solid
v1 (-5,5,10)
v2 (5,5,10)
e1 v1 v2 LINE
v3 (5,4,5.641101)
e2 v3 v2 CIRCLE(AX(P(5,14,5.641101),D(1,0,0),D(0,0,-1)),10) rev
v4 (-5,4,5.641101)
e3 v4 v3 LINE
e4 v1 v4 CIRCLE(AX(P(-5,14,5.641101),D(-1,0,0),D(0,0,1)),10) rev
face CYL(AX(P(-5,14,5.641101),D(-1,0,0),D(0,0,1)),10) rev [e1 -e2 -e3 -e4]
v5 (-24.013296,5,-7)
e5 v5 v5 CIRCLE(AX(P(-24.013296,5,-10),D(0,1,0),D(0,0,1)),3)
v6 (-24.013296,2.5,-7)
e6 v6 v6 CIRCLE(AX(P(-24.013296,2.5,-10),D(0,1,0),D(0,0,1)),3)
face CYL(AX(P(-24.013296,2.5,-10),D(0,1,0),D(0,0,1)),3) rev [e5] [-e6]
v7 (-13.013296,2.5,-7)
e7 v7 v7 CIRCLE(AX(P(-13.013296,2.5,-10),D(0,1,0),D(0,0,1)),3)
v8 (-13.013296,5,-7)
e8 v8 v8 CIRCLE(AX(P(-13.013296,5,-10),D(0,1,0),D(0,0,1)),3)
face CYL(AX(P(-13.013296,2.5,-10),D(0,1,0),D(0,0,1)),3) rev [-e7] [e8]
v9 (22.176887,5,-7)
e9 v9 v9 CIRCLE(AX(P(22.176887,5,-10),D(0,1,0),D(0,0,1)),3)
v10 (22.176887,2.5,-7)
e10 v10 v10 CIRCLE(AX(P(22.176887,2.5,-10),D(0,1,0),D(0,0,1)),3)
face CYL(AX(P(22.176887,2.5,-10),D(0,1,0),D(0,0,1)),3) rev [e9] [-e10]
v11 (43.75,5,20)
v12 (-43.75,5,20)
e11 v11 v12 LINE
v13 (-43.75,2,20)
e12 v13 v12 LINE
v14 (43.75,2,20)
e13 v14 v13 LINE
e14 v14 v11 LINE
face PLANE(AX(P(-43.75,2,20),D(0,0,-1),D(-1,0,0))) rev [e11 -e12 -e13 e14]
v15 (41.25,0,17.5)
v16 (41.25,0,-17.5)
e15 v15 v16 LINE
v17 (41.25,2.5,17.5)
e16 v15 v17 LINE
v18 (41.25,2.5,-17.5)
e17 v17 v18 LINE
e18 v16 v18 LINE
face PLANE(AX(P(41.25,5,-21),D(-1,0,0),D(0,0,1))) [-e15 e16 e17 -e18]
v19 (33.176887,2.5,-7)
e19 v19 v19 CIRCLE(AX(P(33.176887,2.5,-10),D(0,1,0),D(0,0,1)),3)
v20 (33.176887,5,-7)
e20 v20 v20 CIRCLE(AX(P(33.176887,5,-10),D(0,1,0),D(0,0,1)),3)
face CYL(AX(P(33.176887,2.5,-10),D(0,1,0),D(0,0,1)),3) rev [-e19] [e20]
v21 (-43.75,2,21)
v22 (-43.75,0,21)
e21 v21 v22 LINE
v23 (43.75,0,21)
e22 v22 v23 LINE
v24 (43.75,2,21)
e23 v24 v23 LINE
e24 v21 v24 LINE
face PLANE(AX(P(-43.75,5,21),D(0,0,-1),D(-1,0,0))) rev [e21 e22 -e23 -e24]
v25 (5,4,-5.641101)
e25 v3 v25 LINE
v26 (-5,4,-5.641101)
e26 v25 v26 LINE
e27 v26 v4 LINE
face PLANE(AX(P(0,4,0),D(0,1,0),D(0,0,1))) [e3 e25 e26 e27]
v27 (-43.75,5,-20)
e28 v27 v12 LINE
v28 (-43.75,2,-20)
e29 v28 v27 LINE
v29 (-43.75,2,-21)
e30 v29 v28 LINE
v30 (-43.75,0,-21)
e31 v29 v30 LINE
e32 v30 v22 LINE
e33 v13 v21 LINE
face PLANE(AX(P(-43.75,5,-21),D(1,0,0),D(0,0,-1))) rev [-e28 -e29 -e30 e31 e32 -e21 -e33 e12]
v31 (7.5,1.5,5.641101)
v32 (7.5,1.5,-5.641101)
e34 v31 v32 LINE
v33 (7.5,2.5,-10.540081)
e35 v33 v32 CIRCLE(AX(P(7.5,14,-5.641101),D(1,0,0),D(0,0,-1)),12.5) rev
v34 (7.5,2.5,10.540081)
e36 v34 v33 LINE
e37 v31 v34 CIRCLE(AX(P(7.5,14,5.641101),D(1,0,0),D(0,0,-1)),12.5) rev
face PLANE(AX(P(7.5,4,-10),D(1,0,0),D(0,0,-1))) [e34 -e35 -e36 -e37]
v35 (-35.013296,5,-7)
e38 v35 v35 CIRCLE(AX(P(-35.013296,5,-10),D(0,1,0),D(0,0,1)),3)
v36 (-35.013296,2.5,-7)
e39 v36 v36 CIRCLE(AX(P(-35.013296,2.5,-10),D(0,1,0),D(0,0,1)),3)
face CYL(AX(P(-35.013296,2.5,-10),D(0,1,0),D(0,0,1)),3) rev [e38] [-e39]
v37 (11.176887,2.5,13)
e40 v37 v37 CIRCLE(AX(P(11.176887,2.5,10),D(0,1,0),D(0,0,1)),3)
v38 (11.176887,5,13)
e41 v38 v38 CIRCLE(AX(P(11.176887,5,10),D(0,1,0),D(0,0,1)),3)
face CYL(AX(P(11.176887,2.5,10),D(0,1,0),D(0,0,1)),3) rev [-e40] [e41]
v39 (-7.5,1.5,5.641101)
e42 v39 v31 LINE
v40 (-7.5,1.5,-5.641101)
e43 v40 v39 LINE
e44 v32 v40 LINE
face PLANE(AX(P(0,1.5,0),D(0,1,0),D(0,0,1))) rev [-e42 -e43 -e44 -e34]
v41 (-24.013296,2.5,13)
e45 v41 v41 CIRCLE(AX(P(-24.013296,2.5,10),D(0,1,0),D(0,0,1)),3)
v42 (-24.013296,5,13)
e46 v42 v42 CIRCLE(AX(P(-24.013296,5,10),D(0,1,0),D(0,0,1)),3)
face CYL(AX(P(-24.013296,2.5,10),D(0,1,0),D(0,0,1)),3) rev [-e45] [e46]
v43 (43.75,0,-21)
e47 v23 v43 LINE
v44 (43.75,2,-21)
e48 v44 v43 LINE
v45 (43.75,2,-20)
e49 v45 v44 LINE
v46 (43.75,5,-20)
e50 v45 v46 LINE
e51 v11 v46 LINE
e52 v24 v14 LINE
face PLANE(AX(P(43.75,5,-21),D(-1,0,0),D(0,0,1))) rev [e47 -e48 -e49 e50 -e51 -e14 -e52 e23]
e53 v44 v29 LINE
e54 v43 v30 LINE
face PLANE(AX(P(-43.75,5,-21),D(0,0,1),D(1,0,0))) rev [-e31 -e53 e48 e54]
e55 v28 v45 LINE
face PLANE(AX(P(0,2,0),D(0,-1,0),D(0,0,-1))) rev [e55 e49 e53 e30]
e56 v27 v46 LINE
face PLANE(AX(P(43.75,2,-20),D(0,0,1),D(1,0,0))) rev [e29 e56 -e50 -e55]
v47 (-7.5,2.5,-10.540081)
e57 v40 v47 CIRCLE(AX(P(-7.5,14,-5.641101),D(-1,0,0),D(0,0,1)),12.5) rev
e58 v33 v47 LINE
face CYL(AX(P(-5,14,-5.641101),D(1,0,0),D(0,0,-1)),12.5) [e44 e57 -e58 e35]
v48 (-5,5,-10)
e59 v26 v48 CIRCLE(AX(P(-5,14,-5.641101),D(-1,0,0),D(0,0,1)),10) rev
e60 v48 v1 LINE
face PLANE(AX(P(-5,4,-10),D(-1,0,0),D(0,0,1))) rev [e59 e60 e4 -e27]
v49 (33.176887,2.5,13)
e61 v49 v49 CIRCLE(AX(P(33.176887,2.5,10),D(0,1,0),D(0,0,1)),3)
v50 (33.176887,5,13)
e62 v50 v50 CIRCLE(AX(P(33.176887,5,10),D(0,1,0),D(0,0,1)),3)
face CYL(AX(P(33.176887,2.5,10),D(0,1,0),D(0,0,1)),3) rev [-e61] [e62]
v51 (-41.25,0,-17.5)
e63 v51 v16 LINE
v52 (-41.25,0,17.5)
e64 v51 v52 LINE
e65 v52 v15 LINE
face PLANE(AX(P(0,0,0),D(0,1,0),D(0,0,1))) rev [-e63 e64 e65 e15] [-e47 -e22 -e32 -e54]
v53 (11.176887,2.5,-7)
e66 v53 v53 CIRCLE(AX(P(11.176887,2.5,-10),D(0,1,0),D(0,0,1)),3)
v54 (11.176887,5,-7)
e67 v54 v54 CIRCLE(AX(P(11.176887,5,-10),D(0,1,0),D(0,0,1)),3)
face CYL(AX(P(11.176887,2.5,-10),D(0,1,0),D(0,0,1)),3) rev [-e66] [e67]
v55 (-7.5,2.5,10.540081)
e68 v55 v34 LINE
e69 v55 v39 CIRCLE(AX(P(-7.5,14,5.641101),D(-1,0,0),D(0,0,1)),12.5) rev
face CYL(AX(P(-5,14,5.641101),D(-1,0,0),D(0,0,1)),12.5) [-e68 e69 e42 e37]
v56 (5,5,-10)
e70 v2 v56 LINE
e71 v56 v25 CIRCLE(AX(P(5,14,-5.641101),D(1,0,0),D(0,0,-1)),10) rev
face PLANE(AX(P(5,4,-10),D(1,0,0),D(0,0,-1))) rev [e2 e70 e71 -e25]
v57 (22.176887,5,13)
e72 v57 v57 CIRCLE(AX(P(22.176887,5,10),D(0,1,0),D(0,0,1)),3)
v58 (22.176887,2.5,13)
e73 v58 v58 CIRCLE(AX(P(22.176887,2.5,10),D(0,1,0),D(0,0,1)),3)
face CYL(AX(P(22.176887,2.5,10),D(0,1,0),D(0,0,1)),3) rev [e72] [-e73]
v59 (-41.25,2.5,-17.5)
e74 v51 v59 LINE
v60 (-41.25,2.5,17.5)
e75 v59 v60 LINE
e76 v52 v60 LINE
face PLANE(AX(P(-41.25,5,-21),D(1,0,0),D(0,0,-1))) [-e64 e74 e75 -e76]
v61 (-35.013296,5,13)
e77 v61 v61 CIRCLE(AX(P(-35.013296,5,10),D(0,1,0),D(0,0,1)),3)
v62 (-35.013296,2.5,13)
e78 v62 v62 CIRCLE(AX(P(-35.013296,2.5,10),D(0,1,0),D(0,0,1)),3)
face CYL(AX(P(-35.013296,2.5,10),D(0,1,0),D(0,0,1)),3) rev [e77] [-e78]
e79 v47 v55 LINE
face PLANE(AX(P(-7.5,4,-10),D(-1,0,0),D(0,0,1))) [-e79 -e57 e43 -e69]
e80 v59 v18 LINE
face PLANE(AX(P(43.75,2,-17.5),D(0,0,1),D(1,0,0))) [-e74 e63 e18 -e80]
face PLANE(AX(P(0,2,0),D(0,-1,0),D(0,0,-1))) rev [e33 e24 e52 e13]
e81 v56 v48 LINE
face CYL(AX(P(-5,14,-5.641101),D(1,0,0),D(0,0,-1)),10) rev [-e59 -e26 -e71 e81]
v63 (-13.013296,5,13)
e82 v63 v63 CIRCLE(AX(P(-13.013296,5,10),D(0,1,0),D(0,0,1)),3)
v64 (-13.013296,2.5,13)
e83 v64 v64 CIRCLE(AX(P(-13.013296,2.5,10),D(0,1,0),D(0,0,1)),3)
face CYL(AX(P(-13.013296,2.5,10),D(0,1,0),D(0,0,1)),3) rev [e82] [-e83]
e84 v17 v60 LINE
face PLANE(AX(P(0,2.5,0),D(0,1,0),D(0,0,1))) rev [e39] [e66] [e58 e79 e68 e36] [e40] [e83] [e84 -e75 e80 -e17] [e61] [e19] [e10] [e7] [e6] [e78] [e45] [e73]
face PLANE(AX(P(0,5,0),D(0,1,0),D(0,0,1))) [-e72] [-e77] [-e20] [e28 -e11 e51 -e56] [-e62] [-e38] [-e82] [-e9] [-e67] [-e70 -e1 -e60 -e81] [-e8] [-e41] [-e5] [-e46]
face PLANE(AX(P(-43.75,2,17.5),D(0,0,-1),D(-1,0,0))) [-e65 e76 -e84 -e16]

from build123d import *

# Parameters (mm, degrees)
SKETCH1_W           = 87.5
SKETCH1_H           = 42
BOSS_EXTRUDE1_DEPTH = 5
SKETCH2_W           = 87.5
SKETCH2_H           = 1
CUT_EXTRUDE1_DEPTH  = 3
SKETCH3_W           = 87.5
SKETCH3_H           = 1
CUT_EXTRUDE2_DEPTH  = 3
SKETCH4_W           = 10
SKETCH4_H           = 20
CUT_EXTRUDE3_DEPTH  = 1
FILLET1_R           = 10
FILLET2_R           = 10
SHELL6_START        = -41.25
SHELL6_DEPTH        = 82.5
SHELL6_2_DEPTH      = 33.75
SHELL6_START_2      = 7.5
SHELL6_3_DEPTH      = 33.75
SKETCH5_R           = 3
CUT_EXTRUDE4_DEPTH  = 2.5
LPATTERN1_COUNT     = 3
LPATTERN1_PITCH     = 11


# Read off the part's stored shape, not the designer's step: Shell6
with BuildPart() as part:
    # Sketch1 → Boss-Extrude1 (new body)
    with BuildSketch(Plane(origin=(0, 0, 0), x_dir=(1, 0, 0), z_dir=(0, 1, 0))):
        Rectangle(SKETCH1_W, SKETCH1_H)
    extrude(amount=BOSS_EXTRUDE1_DEPTH)

    # Sketch2 → Cut-Extrude1 (cut)
    with BuildSketch(Plane(origin=(0, 5, 0), x_dir=(1, 0, 0), z_dir=(0, 1, 0))):
        with Locations((0, 20.5)):
            Rectangle(SKETCH2_W, SKETCH2_H)
    extrude(amount=-CUT_EXTRUDE1_DEPTH, mode=Mode.SUBTRACT)

    # Sketch3 → Cut-Extrude2 (cut)
    with BuildSketch(Plane(origin=(0, 5, 0), x_dir=(1, 0, 0), z_dir=(0, 1, 0))):
        with Locations((0, -20.5)):
            Rectangle(SKETCH3_W, SKETCH3_H)
    extrude(amount=-CUT_EXTRUDE2_DEPTH, mode=Mode.SUBTRACT)

    # Sketch4 → Cut-Extrude3 (cut)
    with BuildSketch(Plane(origin=(0, 5, 0), x_dir=(1, 0, 0), z_dir=(0, 1, 0))):
        Rectangle(SKETCH4_W, SKETCH4_H)
    extrude(amount=-CUT_EXTRUDE3_DEPTH, mode=Mode.SUBTRACT)

    # Fillet1
    # the kernel refuses this fillet: 10 mm, written as the material it adds along each edge
    with BuildSketch(Plane(origin=(15.897247359, 4, 10), x_dir=(0, 1, 0), z_dir=(-1, 0, 0))) as fillet1_piece_1:
        with BuildLine():
            CenterArc((10, 4.358898944), FILLET1_R, 180, 25.841932763)
            Line((0, 4.358898944), (-0.2, 4.358898944))
            Line((-0.2, 4.358898944), (-0.2, 0))
            Line((-0.2, 0), (0, -0.2))
            ThreePointArc((0, -0.2), (0.5, -0.2), (0.82, -0.087177979))
            Line((0.82, -0.087177979), (1, 0))
        make_face()
    extrude(amount=31.794494718)

    # Fillet2
    # the kernel refuses this fillet: 10 mm, written as the material it adds along each edge
    with BuildSketch(Plane(origin=(-15.897247359, 4, -10), x_dir=(0, 0, 1), z_dir=(1, 0, 0))) as fillet2_piece_1:
        with BuildLine():
            CenterArc((4.358898944, -10), FILLET2_R, 90, 25.841932763)
            Line((0, -1), (-0.087177979, -0.82))
            ThreePointArc((-0.087177979, -0.82), (-0.2, -0.5), (-0.2, 0))
            Line((-0.2, 0), (0, 0.2))
            Line((0, 0.2), (4.358898944, 0.2))
            Line((4.358898944, 0.2), (4.358898944, 0))
        make_face()
    extrude(amount=31.794494718)

    # Shell6 outline → Shell6 (cut)
    with BuildSketch(Plane.YZ.offset(SHELL6_START)):
        with BuildLine():
            Line((0, -17.5), (2.5, -17.5))
            Line((2.5, -17.5), (2.5, -10.540080542))
            ThreePointArc((2.5, -10.540080542), (1.752551286, -8.141101056), (1.5, -5.641101056))
            Line((1.5, -5.641101056), (1.5, 5.641101056))
            ThreePointArc((1.5, 5.641101056), (1.752551286, 8.141101056), (2.5, 10.540080542))
            Line((2.5, 10.540080542), (2.5, 17.5))
            Line((2.5, 17.5), (0, 17.5))
            Line((0, 17.5), (0, -17.5))
        make_face()
    extrude(amount=SHELL6_DEPTH, mode=Mode.SUBTRACT)

    # Shell6 2 outline → Shell6 2 (cut)
    with BuildSketch(Plane.YZ.offset(SHELL6_START)):
        with BuildLine():
            ThreePointArc((1.5, -5.641101056), (1.752551286, -8.141101056), (2.5, -10.540080542))
            Line((2.5, -10.540080542), (2.5, 10.540080542))
            ThreePointArc((2.5, 10.540080542), (1.752551286, 8.141101056), (1.5, 5.641101056))
            Line((1.5, 5.641101056), (1.5, -5.641101056))
        make_face()
    extrude(amount=SHELL6_2_DEPTH, mode=Mode.SUBTRACT)

    # Shell6 3 outline → Shell6 3 (cut)
    with BuildSketch(Plane.YZ.offset(SHELL6_START_2)):
        with BuildLine():
            ThreePointArc((1.5, -5.641101056), (1.752551286, -8.141101056), (2.5, -10.540080542))
            Line((2.5, -10.540080542), (2.5, 10.540080542))
            ThreePointArc((2.5, 10.540080542), (1.752551286, 8.141101056), (1.5, 5.641101056))
            Line((1.5, 5.641101056), (1.5, -5.641101056))
        make_face()
    extrude(amount=SHELL6_3_DEPTH, mode=Mode.SUBTRACT)

    # Sketch5 → Cut-Extrude4 (cut)
    with BuildSketch(Plane(origin=(0, 5, 0), x_dir=(1, 0, 0), z_dir=(0, 1, 0))):
        with Locations(Location((-35.01329609, 10, 0), (0, 0, 270))):
            Circle(SKETCH5_R)
        with Locations(Location((-35.01329609, -10, 0), (0, 0, 270))):
            Circle(SKETCH5_R)
        with Locations(Location((11.17688744, 10, 0), (0, 0, 270))):
            Circle(SKETCH5_R)
        with Locations(Location((11.17688744, -10, 0), (0, 0, 270))):
            Circle(SKETCH5_R)
    cut_extrude4 = extrude(amount=-CUT_EXTRUDE4_DEPTH, mode=Mode.SUBTRACT)

    # LPattern1: Cut-Extrude4 ×3
    with Locations(*[(i * LPATTERN1_PITCH, 0, 0) for i in range(1, LPATTERN1_COUNT)]):
        add(cut_extrude4, mode=Mode.SUBTRACT)


solid = part.part
